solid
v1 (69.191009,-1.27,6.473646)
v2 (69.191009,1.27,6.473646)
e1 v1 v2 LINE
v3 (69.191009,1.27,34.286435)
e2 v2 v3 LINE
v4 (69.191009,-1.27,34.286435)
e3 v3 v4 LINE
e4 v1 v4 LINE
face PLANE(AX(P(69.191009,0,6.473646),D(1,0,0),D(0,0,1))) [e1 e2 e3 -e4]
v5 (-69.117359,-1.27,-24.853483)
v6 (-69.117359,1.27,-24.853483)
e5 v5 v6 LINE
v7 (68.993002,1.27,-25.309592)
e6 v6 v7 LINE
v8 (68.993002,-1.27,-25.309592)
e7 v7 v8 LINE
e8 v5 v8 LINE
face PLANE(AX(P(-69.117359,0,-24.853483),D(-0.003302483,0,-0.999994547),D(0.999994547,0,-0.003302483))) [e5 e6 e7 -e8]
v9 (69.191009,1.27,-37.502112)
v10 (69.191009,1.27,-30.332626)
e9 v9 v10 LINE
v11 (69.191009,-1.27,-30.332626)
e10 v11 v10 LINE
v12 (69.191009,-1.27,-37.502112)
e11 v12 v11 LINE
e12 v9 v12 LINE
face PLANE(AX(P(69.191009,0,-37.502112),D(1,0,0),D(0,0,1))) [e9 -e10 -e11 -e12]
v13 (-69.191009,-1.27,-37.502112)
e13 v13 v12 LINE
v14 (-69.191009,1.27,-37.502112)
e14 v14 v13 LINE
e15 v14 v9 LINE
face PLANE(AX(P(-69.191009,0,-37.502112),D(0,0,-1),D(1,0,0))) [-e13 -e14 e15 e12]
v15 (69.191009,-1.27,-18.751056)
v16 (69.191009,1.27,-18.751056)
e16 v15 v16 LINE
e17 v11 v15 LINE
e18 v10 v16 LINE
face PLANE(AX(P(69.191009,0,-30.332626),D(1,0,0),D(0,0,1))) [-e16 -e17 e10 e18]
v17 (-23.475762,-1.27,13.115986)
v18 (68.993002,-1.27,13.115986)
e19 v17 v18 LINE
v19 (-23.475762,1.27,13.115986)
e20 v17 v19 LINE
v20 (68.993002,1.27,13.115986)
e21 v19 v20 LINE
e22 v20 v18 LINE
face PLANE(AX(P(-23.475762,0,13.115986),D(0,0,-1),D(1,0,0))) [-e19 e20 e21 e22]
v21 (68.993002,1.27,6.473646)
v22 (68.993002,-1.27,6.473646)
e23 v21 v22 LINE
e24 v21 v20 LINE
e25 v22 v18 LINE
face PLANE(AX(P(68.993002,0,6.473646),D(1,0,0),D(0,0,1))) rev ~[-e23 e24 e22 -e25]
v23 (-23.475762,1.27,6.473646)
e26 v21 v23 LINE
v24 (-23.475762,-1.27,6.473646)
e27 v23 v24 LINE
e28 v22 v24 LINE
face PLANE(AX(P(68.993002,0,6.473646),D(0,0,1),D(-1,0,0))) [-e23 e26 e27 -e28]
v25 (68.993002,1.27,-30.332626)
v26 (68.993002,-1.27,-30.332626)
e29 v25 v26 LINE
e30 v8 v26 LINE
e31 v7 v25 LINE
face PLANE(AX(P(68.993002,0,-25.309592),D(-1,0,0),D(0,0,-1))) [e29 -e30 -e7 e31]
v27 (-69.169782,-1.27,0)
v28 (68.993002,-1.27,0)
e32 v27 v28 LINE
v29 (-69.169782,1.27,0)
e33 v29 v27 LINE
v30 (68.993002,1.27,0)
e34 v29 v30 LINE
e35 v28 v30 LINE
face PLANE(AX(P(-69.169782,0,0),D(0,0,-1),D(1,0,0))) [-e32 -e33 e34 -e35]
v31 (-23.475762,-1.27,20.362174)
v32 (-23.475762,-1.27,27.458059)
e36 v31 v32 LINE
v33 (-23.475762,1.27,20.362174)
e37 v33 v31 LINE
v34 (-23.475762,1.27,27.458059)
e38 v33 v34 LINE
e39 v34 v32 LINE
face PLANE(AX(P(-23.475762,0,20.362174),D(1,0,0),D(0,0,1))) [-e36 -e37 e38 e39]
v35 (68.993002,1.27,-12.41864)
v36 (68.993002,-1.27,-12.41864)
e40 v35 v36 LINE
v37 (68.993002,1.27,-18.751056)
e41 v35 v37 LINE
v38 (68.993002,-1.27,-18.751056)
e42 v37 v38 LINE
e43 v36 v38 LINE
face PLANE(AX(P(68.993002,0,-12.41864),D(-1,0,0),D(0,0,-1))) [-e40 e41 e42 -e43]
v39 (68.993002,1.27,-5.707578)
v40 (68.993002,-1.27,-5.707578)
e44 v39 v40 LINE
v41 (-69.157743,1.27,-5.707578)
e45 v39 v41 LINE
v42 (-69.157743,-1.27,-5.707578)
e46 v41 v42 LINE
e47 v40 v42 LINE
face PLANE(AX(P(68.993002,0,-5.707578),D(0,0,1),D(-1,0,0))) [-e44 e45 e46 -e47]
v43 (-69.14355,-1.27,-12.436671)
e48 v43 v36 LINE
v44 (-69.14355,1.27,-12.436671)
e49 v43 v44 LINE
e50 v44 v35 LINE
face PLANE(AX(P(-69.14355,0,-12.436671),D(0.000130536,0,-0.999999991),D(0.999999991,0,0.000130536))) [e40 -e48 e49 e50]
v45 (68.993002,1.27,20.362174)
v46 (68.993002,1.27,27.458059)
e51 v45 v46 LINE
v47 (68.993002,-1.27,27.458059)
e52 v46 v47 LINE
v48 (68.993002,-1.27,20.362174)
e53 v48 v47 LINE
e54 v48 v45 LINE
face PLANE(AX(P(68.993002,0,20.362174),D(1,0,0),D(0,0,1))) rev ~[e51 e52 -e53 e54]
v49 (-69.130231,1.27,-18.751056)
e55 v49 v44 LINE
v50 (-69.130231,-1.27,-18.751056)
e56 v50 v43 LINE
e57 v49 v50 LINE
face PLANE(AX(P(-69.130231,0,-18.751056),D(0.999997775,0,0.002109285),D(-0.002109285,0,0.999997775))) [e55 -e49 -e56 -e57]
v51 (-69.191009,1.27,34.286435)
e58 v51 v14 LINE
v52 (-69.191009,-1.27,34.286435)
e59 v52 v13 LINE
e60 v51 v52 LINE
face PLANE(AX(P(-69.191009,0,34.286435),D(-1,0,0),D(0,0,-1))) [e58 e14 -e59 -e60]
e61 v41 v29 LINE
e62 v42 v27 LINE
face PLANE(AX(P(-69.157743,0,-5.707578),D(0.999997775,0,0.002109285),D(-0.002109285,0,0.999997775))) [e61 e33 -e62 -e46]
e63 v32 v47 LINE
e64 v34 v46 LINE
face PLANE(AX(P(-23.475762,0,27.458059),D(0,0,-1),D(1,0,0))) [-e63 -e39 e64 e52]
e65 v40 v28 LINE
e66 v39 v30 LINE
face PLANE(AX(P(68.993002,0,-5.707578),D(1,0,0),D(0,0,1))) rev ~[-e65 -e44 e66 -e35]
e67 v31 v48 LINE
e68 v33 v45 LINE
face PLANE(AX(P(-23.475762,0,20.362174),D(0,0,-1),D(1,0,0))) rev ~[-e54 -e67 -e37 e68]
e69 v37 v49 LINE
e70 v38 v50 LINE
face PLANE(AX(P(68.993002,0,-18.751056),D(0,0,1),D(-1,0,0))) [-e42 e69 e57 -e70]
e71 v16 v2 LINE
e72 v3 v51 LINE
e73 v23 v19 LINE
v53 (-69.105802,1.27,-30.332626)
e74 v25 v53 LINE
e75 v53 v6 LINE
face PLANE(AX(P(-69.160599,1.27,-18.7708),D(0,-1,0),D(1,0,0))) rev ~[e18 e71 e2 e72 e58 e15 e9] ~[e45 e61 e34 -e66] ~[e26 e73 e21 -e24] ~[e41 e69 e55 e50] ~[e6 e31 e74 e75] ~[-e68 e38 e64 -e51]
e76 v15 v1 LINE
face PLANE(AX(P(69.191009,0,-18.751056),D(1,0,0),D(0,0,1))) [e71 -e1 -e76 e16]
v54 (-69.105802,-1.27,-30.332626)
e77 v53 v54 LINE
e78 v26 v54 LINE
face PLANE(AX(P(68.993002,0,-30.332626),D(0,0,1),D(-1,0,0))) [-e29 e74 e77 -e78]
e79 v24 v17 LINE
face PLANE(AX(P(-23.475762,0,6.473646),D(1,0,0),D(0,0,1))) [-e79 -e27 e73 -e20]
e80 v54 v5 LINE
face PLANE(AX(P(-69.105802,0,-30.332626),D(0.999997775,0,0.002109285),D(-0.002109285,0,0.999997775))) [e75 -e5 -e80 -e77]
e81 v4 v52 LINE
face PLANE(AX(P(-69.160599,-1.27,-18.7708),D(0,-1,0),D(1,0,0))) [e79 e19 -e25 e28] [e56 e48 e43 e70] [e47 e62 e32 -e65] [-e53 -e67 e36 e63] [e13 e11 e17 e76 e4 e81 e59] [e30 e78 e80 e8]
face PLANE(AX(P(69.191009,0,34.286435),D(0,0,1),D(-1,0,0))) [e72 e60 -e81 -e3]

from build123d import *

# Parameters (mm, degrees)
F0_W     = 0.1980072791
F0_H     = 7.1694856525
F0_W_2   = 92.4687646329
F0_H_2   = 6.8283765789
F0_H_3   = 6.473645713
F0_H_4   = 5.7075782395
F0_H_5   = 7.0958843866
F0_H_6   = 7.2461878881
F0_H_7   = 6.6423406824
F1_DEPTH = 1.27


# Not quite as in the source:
# - a feature names something its author has since deleted; it is built from what else it names


with BuildPart() as f1:
    # F0 (on Front) → F1 (new body, symmetric)
    with BuildSketch(Plane.XZ):
        Polygon((-69.1910094554, 0), (-69.1910094554, -37.5021121278), (-69.0906792879, -37.5021121278), (-69.1058018093, -30.3326264753), (-69.1173589099, -24.8534827961), (-69.130230695, -18.7510560639), (-69.1435495608, -12.4366714017), (-69.1577431668, -5.7075782395), (-69.1697821021, 0), align=None)
        Polygon((-69.1058018093, -30.3326264753), (-69.0906792879, -37.5021121278), (68.9930021763, -37.5021121278), (68.9930021763, -30.3326264753), align=None)
        Polygon((-69.1910094554, 34.2864352491), (-69.1910094554, 0), (-69.1697821021, 0), (-23.4757624567, 0), (-23.4757624567, 6.473645713), (-23.4757624567, 13.1159863955), (-23.4757624567, 20.3621742836), (-23.4757624567, 27.4580586702), (-23.4757624567, 34.2864352491), align=None)
        with Locations((69.0920058158, -33.9173693016)):
            Rectangle(F0_W, F0_H)
        Polygon((68.9930021763, -25.3095924286), (68.9930021763, -30.3326264753), (69.1910094554, -30.3326264753), (69.1910094554, -25.3102463479), align=None)
        Polygon((-69.130230695, -18.7510560639), (-69.1173589099, -24.8534827961), (68.9930021763, -25.3095924286), (68.9930021763, -18.7510560639), align=None)
        with Locations((22.7586198598, 30.8722469596)):
            Rectangle(F0_W_2, F0_H_2)
        with Locations((22.7586198598, 3.2368228565)):
            Rectangle(F0_W_2, F0_H_3)
        Polygon((68.9930021763, -5.7075782395), (-69.1577431668, -5.7075782395), (-69.1435495608, -12.4366714017), (68.9930021763, -12.4186396162), align=None)
        Polygon((68.9930021763, -18.7510560639), (68.9930021763, -25.3095924286), (69.1910094554, -25.3102463479), (69.1910094554, -18.7510560639), align=None)
        with Locations((69.0920058158, 30.8722469596)):
            Rectangle(F0_W, F0_H_2)
        with Locations((69.0920058158, 3.2368228565)):
            Rectangle(F0_W, F0_H_3)
        with Locations((69.0920058158, -2.8537891197)):
            Rectangle(F0_W, F0_H_4)
        Polygon((69.1910094554, -5.7075782395), (68.9930021763, -5.7075782395), (68.9930021763, -12.4186396162), (69.1910094554, -12.4186137691), align=None)
        Polygon((68.9930021763, -12.4186396162), (68.9930021763, -18.7510560639), (69.1910094554, -18.7510560639), (69.1910094554, -12.4186137691), align=None)
        with Locations((69.0920058158, 23.9101164769)):
            Rectangle(F0_W, F0_H_5)
        with Locations((22.7586198598, 16.7390803395)):
            Rectangle(F0_W_2, F0_H_6)
        with Locations((69.0920058158, 9.7948160542)):
            Rectangle(F0_W, F0_H_7)
        with Locations((69.0920058158, 16.7390803395)):
            Rectangle(F0_W, F0_H_6)
    extrude(amount=F1_DEPTH, both=True)


solid = f1.part
